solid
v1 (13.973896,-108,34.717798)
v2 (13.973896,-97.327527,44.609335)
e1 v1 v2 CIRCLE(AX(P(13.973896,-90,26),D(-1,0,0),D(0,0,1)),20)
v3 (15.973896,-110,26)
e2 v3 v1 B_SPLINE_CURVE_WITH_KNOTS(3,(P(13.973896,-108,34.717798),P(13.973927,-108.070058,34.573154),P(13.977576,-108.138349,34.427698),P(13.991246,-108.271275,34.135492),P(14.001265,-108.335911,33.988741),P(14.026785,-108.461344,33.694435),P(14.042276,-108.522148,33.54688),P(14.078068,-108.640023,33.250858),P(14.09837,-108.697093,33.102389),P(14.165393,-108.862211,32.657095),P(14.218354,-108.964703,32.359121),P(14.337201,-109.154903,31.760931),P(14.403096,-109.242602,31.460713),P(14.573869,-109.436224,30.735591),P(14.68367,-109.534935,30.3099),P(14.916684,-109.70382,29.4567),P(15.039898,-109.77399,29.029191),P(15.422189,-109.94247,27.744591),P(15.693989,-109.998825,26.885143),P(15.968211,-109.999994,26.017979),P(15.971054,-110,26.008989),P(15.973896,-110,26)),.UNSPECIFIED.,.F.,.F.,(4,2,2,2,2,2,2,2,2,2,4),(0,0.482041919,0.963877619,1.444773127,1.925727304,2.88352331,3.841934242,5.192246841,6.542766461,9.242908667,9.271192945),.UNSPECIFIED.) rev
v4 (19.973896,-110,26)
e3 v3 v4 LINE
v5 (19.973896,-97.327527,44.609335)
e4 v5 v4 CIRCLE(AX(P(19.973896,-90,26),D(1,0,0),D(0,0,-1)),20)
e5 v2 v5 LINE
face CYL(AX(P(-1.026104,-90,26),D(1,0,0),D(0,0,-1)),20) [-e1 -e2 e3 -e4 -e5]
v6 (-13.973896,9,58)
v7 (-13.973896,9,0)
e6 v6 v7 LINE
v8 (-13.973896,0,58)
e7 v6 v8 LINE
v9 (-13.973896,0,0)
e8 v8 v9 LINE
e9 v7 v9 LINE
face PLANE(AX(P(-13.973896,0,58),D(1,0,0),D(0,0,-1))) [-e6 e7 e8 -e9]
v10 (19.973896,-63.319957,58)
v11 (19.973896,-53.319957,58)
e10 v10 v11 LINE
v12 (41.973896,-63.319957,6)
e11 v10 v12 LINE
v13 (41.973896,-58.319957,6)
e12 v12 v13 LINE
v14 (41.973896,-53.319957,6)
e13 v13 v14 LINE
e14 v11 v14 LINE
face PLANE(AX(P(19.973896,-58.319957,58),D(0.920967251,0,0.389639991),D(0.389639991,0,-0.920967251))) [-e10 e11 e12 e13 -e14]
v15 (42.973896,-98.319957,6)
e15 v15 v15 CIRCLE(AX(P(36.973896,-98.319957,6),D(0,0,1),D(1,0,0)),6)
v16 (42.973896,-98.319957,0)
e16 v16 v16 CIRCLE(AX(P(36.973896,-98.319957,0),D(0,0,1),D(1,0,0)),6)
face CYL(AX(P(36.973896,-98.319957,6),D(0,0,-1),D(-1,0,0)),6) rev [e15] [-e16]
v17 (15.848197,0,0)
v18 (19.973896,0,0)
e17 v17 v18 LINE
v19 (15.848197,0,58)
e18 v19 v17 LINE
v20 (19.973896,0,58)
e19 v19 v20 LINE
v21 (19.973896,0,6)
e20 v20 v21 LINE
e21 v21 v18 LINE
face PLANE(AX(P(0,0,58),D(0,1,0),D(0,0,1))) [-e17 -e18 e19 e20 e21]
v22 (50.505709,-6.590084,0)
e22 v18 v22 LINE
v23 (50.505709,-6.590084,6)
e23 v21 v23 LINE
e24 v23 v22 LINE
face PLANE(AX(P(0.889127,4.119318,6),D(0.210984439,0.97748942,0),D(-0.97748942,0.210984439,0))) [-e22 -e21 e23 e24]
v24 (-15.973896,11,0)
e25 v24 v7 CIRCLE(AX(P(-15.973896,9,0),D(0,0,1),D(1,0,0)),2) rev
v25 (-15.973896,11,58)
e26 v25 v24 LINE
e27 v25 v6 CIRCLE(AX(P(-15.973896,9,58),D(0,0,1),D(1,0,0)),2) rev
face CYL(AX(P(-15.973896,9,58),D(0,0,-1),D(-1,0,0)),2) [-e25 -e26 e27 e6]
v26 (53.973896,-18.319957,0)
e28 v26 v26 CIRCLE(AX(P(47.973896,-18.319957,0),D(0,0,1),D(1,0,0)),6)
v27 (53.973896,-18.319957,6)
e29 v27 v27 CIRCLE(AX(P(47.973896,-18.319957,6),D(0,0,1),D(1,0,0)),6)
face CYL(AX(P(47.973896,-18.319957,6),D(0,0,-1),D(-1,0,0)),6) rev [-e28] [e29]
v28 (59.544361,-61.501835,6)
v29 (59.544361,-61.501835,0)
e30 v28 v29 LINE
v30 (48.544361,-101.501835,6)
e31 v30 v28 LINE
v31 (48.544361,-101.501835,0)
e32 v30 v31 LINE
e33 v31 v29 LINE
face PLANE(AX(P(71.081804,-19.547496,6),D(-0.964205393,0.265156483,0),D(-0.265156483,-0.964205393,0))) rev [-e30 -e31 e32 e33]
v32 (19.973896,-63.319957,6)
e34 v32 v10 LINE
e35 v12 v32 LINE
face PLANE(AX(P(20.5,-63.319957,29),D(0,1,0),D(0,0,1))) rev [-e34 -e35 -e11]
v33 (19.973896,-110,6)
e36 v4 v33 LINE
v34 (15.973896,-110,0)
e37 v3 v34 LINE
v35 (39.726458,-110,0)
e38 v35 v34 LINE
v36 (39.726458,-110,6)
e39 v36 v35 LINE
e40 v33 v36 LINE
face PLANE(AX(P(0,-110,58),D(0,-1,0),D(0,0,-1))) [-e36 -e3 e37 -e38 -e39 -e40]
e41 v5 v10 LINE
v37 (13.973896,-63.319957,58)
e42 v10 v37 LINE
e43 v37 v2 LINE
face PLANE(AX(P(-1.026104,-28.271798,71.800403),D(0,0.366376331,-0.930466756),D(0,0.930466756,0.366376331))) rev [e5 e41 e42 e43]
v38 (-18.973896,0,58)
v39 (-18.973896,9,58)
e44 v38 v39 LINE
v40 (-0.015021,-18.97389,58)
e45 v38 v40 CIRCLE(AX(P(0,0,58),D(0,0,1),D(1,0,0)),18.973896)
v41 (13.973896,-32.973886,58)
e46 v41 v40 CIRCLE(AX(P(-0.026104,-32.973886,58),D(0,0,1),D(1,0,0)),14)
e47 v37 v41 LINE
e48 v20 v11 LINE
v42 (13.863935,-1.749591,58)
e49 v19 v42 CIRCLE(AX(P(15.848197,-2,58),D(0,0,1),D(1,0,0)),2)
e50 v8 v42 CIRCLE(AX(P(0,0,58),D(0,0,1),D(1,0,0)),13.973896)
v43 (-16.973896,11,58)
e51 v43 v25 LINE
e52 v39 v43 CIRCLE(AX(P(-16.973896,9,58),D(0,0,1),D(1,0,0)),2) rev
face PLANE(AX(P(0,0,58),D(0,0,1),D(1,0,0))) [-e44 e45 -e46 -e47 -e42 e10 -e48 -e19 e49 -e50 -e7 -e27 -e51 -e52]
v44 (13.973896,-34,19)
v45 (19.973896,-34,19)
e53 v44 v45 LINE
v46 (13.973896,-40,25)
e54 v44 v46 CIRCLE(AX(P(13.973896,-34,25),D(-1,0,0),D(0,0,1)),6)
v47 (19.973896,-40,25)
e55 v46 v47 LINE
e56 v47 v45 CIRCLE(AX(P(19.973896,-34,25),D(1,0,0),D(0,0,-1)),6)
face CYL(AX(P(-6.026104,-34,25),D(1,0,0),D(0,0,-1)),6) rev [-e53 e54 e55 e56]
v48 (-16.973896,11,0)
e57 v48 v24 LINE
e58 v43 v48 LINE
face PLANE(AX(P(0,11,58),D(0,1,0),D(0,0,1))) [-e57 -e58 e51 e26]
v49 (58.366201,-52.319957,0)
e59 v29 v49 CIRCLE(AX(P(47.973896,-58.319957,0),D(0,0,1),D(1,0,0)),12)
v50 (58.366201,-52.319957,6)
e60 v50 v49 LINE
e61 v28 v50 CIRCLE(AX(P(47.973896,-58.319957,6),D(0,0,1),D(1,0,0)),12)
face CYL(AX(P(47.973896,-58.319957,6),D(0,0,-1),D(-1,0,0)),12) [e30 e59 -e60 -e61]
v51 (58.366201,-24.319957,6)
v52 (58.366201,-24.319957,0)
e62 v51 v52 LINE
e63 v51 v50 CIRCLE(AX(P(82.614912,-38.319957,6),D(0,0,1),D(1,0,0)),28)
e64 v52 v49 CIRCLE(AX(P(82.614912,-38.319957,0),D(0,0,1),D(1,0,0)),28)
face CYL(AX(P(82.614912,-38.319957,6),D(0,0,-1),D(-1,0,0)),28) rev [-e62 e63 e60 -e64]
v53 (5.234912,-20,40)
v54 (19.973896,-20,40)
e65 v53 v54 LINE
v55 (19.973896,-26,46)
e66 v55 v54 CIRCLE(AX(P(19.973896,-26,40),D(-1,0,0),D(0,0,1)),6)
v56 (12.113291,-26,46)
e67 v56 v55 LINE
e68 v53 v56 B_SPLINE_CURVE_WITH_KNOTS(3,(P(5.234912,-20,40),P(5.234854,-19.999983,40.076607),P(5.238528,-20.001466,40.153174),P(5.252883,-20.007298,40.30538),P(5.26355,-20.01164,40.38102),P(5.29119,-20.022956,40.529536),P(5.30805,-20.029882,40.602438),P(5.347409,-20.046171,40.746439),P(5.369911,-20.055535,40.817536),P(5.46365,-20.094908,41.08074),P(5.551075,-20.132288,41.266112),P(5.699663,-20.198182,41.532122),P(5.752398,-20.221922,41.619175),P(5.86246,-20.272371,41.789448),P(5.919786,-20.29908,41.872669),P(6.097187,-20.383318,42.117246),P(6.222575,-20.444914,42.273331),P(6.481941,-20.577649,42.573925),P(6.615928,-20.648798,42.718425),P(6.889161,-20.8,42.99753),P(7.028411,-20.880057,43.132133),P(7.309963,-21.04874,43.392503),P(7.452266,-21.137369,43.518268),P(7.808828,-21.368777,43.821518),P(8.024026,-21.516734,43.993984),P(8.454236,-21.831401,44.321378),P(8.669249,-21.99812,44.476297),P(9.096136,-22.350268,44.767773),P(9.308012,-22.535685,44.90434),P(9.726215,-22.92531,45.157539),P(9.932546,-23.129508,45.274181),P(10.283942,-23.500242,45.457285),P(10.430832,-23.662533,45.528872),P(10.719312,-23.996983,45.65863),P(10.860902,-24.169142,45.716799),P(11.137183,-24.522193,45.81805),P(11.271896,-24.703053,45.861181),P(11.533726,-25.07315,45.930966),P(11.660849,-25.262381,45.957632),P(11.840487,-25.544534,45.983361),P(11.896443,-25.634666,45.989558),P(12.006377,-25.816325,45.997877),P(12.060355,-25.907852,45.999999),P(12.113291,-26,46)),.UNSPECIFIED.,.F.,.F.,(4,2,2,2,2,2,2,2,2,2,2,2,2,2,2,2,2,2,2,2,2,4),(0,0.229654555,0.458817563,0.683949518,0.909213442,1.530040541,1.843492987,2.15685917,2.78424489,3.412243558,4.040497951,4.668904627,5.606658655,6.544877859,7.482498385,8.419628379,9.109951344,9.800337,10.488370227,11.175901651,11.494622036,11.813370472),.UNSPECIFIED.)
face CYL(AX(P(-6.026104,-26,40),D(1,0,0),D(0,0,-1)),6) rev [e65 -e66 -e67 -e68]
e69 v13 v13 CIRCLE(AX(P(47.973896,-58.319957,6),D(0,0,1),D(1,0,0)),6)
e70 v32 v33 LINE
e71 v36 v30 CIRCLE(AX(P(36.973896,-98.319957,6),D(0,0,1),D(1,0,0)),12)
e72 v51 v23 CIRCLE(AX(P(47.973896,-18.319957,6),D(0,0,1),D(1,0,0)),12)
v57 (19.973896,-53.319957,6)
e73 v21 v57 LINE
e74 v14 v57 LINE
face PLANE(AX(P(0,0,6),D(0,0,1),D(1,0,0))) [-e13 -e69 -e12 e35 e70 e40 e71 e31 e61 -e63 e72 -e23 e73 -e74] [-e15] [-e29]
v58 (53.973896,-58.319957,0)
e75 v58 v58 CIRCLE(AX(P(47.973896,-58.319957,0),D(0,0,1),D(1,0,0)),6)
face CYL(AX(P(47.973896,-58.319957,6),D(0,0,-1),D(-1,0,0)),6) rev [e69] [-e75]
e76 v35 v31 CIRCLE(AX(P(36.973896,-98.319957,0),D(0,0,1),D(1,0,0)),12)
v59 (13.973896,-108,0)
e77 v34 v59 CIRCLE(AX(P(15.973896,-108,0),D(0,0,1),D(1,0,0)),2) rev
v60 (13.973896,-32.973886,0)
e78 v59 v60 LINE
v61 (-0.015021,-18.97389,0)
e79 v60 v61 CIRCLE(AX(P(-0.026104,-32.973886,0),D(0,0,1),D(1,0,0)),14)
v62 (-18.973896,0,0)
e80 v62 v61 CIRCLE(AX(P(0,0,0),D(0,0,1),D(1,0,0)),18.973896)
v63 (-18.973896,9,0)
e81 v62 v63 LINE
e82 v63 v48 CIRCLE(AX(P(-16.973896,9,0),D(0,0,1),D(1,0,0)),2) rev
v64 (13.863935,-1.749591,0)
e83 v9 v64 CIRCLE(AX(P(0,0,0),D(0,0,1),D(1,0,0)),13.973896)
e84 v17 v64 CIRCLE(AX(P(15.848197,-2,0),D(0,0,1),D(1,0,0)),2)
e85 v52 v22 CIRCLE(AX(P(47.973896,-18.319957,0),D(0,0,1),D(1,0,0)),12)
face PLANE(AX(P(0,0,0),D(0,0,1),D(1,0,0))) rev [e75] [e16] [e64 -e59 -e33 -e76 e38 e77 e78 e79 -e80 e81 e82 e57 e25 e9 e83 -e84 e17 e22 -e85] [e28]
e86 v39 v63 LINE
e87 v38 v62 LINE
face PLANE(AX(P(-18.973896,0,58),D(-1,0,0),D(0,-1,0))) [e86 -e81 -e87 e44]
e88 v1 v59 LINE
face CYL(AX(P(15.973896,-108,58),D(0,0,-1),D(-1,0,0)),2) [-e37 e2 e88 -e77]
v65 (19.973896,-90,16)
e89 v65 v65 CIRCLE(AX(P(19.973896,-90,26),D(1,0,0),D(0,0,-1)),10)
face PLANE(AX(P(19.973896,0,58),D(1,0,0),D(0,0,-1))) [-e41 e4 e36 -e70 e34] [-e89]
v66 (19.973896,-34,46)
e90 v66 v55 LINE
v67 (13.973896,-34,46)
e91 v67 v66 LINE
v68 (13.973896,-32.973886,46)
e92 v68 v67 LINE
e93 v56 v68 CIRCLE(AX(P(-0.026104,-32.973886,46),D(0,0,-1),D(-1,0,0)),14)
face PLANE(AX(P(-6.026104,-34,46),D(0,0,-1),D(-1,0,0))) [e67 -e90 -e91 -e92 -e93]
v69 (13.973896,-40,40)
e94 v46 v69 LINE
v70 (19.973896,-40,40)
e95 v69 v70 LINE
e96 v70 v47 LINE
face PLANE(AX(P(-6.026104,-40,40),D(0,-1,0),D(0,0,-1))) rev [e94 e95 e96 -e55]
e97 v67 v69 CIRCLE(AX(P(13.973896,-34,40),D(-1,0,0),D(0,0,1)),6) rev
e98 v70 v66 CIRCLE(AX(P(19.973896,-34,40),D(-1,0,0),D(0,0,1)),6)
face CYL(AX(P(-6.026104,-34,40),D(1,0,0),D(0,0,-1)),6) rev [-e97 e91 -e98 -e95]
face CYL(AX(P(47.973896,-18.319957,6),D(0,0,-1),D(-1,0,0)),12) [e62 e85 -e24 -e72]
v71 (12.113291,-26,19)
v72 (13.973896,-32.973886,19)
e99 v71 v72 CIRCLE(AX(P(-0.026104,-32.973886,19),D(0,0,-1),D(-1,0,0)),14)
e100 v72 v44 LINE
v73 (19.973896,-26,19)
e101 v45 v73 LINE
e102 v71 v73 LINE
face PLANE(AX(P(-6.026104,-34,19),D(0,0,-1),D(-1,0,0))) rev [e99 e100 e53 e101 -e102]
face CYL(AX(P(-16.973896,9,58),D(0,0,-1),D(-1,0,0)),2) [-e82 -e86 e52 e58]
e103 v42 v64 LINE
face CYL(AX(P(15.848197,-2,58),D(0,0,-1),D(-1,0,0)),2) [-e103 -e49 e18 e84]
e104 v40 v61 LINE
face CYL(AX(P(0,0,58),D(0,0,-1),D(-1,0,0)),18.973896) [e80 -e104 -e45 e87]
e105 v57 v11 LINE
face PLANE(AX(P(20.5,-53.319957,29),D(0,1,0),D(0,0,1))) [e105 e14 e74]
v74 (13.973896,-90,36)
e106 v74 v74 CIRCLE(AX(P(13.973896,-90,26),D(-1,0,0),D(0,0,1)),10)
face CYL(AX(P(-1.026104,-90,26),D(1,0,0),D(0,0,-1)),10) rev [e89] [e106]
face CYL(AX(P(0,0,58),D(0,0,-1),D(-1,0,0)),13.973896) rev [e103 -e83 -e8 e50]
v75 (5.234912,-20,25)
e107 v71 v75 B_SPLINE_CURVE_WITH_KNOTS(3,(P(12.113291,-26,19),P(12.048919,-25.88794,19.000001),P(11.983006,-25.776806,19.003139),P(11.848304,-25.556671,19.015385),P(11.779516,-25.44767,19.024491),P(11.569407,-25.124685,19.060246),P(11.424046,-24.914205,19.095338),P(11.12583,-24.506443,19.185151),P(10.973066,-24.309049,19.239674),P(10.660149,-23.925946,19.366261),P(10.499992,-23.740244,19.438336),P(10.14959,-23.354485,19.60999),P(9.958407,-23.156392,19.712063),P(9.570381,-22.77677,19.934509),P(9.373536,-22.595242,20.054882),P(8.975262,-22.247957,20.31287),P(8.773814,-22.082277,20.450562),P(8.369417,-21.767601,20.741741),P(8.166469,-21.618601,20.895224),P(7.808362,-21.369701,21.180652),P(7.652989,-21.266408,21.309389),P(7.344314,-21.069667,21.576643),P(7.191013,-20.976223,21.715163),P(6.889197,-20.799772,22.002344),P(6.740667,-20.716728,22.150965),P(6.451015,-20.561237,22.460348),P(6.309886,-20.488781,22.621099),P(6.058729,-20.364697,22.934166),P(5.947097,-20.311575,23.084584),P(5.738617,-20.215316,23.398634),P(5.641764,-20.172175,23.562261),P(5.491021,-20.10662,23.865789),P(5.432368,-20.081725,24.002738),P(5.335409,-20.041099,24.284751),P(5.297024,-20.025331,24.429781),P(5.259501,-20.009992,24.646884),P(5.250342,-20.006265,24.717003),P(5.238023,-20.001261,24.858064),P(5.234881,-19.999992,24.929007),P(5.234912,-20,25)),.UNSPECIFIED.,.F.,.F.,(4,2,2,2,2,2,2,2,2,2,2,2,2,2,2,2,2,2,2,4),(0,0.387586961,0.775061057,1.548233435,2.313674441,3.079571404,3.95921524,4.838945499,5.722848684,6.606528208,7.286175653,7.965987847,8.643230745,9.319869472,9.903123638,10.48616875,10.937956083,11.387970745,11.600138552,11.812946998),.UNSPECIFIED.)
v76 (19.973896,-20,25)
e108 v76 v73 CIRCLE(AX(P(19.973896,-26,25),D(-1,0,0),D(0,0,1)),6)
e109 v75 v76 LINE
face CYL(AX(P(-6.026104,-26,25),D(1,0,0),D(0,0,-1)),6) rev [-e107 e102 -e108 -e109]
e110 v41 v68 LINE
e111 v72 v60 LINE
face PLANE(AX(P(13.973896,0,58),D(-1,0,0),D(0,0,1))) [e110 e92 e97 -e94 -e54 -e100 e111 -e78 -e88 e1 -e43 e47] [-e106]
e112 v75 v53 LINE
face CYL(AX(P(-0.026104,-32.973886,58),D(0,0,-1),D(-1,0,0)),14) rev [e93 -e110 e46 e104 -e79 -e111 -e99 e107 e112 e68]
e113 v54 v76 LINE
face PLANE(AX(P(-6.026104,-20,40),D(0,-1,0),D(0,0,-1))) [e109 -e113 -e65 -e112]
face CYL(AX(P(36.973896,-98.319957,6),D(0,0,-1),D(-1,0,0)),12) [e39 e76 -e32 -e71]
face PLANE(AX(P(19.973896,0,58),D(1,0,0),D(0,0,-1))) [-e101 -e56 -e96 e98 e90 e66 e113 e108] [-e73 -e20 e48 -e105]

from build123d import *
from OCP.BRepAlgoAPI import BRepAlgoAPI_Cut
from OCP.TopTools import TopTools_ListOfShape

# Parameters (mm, degrees)
BOSS_EXTRUDE1_DEPTH = 58
SKETCH1_4_R         = 6
BOSS_EXTRUDE3_DEPTH = 6
CUT_EXTRUDE8_DEPTH  = 26
RIB14_REACH         = 110.472
SKETCH8_WALL_W      = 275.405915094
SKETCH8_WALL_H      = 10
SKETCH10_R          = 10
CUT_EXTRUDE10_DEPTH = 21


with BuildPart() as part:
    # Sketch1 → Boss-Extrude1 (new body)
    with BuildSketch(Plane.XY):
        with BuildLine():
            Line((-18.973896199, 9), (-18.973896199, 0))
            ThreePointArc((-18.973896199, 0), (-13.421880234, -13.411258999), (-0.015020694, -18.973890253))
            ThreePointArc((-0.015020694, -18.973890253), (9.87730883, -23.078310175), (13.973896199, -32.973885866))
            Line((13.973896199, -32.973885866), (13.973896199, -108))
            ThreePointArc((13.973896199, -108), (14.559682636, -109.414213562), (15.973896199, -110))
            Line((15.973896199, -110), (19.973896199, -110))
            Line((19.973896199, -110), (19.973896199, 0))
            Line((19.973896199, 0), (15.848197366, 0))
            ThreePointArc((15.848197366, 0), (14.525476133, -0.499863827), (13.863935397, -1.749591462))
            ThreePointArc((13.863935397, -1.749591462), (-0.876521771, -13.946378905), (-13.973896199, 0))
            Line((-13.973896199, 0), (-13.973896199, 9))
            ThreePointArc((-13.973896199, 9), (-14.559682636, 10.414213562), (-15.973896199, 11))
            Line((-15.973896199, 11), (-16.973896199, 11))
            ThreePointArc((-16.973896199, 11), (-18.388109761, 10.414213562), (-18.973896199, 9))
        make_face()
    extrude(amount=BOSS_EXTRUDE1_DEPTH)

    # Sketch1<4> → Boss-Extrude3 (add)
    with BuildSketch(Plane.XY):
        with BuildLine():
            Line((19.973896199, 0), (19.973896199, -110))
            Line((19.973896199, -110), (39.726458462, -110))
            ThreePointArc((39.726458462, -110), (45.301079262, -106.960444534), (48.544360912, -101.501834946))
            Line((48.544360912, -101.501834946), (59.544360912, -61.501834946))
            ThreePointArc((59.544360912, -61.501834946), (59.876313249, -56.792715074), (58.366201044, -52.31995715))
            ThreePointArc((58.366201044, -52.31995715), (54.61491235, -38.31995715), (58.366201044, -24.31995715))
            ThreePointArc((58.366201044, -24.31995715), (58.944097052, -13.456348075), (50.505709466, -6.590084108))
            Line((50.505709466, -6.590084108), (19.973896199, 0))
        make_face()
        with Locations((36.973896199, -98.31995715)):
            Circle(SKETCH1_4_R, mode=Mode.SUBTRACT)
        with Locations((47.973896199, -58.31995715)):
            Circle(SKETCH1_4_R, mode=Mode.SUBTRACT)
        with Locations((47.973896199, -18.31995715)):
            Circle(SKETCH1_4_R, mode=Mode.SUBTRACT)
    extrude(amount=BOSS_EXTRUDE3_DEPTH)

    # Sketch6 → Cut-Extrude8 (cut)
    with BuildSketch(Plane(origin=(19.973896199, 0, 0), x_dir=(0, 0, -1), z_dir=(1, 0, 0))):
        with BuildLine():
            Line((-40, -40), (-25, -40))
            ThreePointArc((-25, -40), (-20.757359313, -38.242640687), (-19, -34))
            Line((-19, -34), (-19, -26))
            ThreePointArc((-19, -26), (-20.757359313, -21.757359313), (-25, -20))
            Line((-25, -20), (-40, -20))
            ThreePointArc((-40, -20), (-44.242640687, -21.757359313), (-46, -26))
            Line((-46, -26), (-46, -34))
            ThreePointArc((-46, -34), (-44.242640687, -38.242640687), (-40, -40))
        make_face()
    extrude(amount=-CUT_EXTRUDE8_DEPTH, mode=Mode.SUBTRACT)

    # Sketch8 wall → Rib14 (add, up to next)
    with BuildSketch(Plane(origin=(30.973896199, -58.31995715, 32), x_dir=(0.389639990837, 0, -0.920967251069), z_dir=(-0.920967251069, 0, -0.389639990837)), mode=Mode.PRIVATE) as rib14_sk1:
        Rectangle(SKETCH8_WALL_W, SKETCH8_WALL_H)
    rib14_tool1 = extrude(rib14_sk1.sketch, amount=RIB14_REACH, mode=Mode.PRIVATE) - part.part
    add(rib14_tool1.solids().sort_by_distance((30.973896199, -58.31995715, 32))[0])


with BuildPart() as cut_extrude10_tool:
    # Sketch10 → Cut-Extrude10 (new body)
    with BuildSketch(Plane(origin=(19.973896199, 0, 0), x_dir=(0, 0, -1), z_dir=(1, 0, 0))):
        with BuildLine():
            ThreePointArc((-26.000000311, -110), (-37.257208214, -106.531039387), (-44.609335124, -97.327526611))
            Line((-44.609335124, -97.327526611), (-58, -63.31995715))
            Line((-58, -63.31995715), (-58, -110))
            Line((-58, -110), (-26.000000311, -110))
        make_face()
        with Locations((-26, -90)):
            Circle(SKETCH10_R)
    extrude(amount=-CUT_EXTRUDE10_DEPTH)


with BuildPart() as part_1:
    add(part.part)

    # Cut-Extrude10: cut by cut_extrude10_tool, with a tolerance
    cut_extrude10_stock = TopTools_ListOfShape()
    cut_extrude10_stock.Append(part_1.part.wrapped)
    cut_extrude10_tools = TopTools_ListOfShape()
    cut_extrude10_tools.Append(cut_extrude10_tool.part.wrapped)
    cut_extrude10_cut = BRepAlgoAPI_Cut()
    cut_extrude10_cut.SetArguments(cut_extrude10_stock)
    cut_extrude10_cut.SetTools(cut_extrude10_tools)
    cut_extrude10_cut.SetFuzzyValue(0.00001)
    cut_extrude10_cut.Build()
    add(Compound.cast(cut_extrude10_cut.Shape()).solids(), mode=Mode.REPLACE)


solid = part_1.part
